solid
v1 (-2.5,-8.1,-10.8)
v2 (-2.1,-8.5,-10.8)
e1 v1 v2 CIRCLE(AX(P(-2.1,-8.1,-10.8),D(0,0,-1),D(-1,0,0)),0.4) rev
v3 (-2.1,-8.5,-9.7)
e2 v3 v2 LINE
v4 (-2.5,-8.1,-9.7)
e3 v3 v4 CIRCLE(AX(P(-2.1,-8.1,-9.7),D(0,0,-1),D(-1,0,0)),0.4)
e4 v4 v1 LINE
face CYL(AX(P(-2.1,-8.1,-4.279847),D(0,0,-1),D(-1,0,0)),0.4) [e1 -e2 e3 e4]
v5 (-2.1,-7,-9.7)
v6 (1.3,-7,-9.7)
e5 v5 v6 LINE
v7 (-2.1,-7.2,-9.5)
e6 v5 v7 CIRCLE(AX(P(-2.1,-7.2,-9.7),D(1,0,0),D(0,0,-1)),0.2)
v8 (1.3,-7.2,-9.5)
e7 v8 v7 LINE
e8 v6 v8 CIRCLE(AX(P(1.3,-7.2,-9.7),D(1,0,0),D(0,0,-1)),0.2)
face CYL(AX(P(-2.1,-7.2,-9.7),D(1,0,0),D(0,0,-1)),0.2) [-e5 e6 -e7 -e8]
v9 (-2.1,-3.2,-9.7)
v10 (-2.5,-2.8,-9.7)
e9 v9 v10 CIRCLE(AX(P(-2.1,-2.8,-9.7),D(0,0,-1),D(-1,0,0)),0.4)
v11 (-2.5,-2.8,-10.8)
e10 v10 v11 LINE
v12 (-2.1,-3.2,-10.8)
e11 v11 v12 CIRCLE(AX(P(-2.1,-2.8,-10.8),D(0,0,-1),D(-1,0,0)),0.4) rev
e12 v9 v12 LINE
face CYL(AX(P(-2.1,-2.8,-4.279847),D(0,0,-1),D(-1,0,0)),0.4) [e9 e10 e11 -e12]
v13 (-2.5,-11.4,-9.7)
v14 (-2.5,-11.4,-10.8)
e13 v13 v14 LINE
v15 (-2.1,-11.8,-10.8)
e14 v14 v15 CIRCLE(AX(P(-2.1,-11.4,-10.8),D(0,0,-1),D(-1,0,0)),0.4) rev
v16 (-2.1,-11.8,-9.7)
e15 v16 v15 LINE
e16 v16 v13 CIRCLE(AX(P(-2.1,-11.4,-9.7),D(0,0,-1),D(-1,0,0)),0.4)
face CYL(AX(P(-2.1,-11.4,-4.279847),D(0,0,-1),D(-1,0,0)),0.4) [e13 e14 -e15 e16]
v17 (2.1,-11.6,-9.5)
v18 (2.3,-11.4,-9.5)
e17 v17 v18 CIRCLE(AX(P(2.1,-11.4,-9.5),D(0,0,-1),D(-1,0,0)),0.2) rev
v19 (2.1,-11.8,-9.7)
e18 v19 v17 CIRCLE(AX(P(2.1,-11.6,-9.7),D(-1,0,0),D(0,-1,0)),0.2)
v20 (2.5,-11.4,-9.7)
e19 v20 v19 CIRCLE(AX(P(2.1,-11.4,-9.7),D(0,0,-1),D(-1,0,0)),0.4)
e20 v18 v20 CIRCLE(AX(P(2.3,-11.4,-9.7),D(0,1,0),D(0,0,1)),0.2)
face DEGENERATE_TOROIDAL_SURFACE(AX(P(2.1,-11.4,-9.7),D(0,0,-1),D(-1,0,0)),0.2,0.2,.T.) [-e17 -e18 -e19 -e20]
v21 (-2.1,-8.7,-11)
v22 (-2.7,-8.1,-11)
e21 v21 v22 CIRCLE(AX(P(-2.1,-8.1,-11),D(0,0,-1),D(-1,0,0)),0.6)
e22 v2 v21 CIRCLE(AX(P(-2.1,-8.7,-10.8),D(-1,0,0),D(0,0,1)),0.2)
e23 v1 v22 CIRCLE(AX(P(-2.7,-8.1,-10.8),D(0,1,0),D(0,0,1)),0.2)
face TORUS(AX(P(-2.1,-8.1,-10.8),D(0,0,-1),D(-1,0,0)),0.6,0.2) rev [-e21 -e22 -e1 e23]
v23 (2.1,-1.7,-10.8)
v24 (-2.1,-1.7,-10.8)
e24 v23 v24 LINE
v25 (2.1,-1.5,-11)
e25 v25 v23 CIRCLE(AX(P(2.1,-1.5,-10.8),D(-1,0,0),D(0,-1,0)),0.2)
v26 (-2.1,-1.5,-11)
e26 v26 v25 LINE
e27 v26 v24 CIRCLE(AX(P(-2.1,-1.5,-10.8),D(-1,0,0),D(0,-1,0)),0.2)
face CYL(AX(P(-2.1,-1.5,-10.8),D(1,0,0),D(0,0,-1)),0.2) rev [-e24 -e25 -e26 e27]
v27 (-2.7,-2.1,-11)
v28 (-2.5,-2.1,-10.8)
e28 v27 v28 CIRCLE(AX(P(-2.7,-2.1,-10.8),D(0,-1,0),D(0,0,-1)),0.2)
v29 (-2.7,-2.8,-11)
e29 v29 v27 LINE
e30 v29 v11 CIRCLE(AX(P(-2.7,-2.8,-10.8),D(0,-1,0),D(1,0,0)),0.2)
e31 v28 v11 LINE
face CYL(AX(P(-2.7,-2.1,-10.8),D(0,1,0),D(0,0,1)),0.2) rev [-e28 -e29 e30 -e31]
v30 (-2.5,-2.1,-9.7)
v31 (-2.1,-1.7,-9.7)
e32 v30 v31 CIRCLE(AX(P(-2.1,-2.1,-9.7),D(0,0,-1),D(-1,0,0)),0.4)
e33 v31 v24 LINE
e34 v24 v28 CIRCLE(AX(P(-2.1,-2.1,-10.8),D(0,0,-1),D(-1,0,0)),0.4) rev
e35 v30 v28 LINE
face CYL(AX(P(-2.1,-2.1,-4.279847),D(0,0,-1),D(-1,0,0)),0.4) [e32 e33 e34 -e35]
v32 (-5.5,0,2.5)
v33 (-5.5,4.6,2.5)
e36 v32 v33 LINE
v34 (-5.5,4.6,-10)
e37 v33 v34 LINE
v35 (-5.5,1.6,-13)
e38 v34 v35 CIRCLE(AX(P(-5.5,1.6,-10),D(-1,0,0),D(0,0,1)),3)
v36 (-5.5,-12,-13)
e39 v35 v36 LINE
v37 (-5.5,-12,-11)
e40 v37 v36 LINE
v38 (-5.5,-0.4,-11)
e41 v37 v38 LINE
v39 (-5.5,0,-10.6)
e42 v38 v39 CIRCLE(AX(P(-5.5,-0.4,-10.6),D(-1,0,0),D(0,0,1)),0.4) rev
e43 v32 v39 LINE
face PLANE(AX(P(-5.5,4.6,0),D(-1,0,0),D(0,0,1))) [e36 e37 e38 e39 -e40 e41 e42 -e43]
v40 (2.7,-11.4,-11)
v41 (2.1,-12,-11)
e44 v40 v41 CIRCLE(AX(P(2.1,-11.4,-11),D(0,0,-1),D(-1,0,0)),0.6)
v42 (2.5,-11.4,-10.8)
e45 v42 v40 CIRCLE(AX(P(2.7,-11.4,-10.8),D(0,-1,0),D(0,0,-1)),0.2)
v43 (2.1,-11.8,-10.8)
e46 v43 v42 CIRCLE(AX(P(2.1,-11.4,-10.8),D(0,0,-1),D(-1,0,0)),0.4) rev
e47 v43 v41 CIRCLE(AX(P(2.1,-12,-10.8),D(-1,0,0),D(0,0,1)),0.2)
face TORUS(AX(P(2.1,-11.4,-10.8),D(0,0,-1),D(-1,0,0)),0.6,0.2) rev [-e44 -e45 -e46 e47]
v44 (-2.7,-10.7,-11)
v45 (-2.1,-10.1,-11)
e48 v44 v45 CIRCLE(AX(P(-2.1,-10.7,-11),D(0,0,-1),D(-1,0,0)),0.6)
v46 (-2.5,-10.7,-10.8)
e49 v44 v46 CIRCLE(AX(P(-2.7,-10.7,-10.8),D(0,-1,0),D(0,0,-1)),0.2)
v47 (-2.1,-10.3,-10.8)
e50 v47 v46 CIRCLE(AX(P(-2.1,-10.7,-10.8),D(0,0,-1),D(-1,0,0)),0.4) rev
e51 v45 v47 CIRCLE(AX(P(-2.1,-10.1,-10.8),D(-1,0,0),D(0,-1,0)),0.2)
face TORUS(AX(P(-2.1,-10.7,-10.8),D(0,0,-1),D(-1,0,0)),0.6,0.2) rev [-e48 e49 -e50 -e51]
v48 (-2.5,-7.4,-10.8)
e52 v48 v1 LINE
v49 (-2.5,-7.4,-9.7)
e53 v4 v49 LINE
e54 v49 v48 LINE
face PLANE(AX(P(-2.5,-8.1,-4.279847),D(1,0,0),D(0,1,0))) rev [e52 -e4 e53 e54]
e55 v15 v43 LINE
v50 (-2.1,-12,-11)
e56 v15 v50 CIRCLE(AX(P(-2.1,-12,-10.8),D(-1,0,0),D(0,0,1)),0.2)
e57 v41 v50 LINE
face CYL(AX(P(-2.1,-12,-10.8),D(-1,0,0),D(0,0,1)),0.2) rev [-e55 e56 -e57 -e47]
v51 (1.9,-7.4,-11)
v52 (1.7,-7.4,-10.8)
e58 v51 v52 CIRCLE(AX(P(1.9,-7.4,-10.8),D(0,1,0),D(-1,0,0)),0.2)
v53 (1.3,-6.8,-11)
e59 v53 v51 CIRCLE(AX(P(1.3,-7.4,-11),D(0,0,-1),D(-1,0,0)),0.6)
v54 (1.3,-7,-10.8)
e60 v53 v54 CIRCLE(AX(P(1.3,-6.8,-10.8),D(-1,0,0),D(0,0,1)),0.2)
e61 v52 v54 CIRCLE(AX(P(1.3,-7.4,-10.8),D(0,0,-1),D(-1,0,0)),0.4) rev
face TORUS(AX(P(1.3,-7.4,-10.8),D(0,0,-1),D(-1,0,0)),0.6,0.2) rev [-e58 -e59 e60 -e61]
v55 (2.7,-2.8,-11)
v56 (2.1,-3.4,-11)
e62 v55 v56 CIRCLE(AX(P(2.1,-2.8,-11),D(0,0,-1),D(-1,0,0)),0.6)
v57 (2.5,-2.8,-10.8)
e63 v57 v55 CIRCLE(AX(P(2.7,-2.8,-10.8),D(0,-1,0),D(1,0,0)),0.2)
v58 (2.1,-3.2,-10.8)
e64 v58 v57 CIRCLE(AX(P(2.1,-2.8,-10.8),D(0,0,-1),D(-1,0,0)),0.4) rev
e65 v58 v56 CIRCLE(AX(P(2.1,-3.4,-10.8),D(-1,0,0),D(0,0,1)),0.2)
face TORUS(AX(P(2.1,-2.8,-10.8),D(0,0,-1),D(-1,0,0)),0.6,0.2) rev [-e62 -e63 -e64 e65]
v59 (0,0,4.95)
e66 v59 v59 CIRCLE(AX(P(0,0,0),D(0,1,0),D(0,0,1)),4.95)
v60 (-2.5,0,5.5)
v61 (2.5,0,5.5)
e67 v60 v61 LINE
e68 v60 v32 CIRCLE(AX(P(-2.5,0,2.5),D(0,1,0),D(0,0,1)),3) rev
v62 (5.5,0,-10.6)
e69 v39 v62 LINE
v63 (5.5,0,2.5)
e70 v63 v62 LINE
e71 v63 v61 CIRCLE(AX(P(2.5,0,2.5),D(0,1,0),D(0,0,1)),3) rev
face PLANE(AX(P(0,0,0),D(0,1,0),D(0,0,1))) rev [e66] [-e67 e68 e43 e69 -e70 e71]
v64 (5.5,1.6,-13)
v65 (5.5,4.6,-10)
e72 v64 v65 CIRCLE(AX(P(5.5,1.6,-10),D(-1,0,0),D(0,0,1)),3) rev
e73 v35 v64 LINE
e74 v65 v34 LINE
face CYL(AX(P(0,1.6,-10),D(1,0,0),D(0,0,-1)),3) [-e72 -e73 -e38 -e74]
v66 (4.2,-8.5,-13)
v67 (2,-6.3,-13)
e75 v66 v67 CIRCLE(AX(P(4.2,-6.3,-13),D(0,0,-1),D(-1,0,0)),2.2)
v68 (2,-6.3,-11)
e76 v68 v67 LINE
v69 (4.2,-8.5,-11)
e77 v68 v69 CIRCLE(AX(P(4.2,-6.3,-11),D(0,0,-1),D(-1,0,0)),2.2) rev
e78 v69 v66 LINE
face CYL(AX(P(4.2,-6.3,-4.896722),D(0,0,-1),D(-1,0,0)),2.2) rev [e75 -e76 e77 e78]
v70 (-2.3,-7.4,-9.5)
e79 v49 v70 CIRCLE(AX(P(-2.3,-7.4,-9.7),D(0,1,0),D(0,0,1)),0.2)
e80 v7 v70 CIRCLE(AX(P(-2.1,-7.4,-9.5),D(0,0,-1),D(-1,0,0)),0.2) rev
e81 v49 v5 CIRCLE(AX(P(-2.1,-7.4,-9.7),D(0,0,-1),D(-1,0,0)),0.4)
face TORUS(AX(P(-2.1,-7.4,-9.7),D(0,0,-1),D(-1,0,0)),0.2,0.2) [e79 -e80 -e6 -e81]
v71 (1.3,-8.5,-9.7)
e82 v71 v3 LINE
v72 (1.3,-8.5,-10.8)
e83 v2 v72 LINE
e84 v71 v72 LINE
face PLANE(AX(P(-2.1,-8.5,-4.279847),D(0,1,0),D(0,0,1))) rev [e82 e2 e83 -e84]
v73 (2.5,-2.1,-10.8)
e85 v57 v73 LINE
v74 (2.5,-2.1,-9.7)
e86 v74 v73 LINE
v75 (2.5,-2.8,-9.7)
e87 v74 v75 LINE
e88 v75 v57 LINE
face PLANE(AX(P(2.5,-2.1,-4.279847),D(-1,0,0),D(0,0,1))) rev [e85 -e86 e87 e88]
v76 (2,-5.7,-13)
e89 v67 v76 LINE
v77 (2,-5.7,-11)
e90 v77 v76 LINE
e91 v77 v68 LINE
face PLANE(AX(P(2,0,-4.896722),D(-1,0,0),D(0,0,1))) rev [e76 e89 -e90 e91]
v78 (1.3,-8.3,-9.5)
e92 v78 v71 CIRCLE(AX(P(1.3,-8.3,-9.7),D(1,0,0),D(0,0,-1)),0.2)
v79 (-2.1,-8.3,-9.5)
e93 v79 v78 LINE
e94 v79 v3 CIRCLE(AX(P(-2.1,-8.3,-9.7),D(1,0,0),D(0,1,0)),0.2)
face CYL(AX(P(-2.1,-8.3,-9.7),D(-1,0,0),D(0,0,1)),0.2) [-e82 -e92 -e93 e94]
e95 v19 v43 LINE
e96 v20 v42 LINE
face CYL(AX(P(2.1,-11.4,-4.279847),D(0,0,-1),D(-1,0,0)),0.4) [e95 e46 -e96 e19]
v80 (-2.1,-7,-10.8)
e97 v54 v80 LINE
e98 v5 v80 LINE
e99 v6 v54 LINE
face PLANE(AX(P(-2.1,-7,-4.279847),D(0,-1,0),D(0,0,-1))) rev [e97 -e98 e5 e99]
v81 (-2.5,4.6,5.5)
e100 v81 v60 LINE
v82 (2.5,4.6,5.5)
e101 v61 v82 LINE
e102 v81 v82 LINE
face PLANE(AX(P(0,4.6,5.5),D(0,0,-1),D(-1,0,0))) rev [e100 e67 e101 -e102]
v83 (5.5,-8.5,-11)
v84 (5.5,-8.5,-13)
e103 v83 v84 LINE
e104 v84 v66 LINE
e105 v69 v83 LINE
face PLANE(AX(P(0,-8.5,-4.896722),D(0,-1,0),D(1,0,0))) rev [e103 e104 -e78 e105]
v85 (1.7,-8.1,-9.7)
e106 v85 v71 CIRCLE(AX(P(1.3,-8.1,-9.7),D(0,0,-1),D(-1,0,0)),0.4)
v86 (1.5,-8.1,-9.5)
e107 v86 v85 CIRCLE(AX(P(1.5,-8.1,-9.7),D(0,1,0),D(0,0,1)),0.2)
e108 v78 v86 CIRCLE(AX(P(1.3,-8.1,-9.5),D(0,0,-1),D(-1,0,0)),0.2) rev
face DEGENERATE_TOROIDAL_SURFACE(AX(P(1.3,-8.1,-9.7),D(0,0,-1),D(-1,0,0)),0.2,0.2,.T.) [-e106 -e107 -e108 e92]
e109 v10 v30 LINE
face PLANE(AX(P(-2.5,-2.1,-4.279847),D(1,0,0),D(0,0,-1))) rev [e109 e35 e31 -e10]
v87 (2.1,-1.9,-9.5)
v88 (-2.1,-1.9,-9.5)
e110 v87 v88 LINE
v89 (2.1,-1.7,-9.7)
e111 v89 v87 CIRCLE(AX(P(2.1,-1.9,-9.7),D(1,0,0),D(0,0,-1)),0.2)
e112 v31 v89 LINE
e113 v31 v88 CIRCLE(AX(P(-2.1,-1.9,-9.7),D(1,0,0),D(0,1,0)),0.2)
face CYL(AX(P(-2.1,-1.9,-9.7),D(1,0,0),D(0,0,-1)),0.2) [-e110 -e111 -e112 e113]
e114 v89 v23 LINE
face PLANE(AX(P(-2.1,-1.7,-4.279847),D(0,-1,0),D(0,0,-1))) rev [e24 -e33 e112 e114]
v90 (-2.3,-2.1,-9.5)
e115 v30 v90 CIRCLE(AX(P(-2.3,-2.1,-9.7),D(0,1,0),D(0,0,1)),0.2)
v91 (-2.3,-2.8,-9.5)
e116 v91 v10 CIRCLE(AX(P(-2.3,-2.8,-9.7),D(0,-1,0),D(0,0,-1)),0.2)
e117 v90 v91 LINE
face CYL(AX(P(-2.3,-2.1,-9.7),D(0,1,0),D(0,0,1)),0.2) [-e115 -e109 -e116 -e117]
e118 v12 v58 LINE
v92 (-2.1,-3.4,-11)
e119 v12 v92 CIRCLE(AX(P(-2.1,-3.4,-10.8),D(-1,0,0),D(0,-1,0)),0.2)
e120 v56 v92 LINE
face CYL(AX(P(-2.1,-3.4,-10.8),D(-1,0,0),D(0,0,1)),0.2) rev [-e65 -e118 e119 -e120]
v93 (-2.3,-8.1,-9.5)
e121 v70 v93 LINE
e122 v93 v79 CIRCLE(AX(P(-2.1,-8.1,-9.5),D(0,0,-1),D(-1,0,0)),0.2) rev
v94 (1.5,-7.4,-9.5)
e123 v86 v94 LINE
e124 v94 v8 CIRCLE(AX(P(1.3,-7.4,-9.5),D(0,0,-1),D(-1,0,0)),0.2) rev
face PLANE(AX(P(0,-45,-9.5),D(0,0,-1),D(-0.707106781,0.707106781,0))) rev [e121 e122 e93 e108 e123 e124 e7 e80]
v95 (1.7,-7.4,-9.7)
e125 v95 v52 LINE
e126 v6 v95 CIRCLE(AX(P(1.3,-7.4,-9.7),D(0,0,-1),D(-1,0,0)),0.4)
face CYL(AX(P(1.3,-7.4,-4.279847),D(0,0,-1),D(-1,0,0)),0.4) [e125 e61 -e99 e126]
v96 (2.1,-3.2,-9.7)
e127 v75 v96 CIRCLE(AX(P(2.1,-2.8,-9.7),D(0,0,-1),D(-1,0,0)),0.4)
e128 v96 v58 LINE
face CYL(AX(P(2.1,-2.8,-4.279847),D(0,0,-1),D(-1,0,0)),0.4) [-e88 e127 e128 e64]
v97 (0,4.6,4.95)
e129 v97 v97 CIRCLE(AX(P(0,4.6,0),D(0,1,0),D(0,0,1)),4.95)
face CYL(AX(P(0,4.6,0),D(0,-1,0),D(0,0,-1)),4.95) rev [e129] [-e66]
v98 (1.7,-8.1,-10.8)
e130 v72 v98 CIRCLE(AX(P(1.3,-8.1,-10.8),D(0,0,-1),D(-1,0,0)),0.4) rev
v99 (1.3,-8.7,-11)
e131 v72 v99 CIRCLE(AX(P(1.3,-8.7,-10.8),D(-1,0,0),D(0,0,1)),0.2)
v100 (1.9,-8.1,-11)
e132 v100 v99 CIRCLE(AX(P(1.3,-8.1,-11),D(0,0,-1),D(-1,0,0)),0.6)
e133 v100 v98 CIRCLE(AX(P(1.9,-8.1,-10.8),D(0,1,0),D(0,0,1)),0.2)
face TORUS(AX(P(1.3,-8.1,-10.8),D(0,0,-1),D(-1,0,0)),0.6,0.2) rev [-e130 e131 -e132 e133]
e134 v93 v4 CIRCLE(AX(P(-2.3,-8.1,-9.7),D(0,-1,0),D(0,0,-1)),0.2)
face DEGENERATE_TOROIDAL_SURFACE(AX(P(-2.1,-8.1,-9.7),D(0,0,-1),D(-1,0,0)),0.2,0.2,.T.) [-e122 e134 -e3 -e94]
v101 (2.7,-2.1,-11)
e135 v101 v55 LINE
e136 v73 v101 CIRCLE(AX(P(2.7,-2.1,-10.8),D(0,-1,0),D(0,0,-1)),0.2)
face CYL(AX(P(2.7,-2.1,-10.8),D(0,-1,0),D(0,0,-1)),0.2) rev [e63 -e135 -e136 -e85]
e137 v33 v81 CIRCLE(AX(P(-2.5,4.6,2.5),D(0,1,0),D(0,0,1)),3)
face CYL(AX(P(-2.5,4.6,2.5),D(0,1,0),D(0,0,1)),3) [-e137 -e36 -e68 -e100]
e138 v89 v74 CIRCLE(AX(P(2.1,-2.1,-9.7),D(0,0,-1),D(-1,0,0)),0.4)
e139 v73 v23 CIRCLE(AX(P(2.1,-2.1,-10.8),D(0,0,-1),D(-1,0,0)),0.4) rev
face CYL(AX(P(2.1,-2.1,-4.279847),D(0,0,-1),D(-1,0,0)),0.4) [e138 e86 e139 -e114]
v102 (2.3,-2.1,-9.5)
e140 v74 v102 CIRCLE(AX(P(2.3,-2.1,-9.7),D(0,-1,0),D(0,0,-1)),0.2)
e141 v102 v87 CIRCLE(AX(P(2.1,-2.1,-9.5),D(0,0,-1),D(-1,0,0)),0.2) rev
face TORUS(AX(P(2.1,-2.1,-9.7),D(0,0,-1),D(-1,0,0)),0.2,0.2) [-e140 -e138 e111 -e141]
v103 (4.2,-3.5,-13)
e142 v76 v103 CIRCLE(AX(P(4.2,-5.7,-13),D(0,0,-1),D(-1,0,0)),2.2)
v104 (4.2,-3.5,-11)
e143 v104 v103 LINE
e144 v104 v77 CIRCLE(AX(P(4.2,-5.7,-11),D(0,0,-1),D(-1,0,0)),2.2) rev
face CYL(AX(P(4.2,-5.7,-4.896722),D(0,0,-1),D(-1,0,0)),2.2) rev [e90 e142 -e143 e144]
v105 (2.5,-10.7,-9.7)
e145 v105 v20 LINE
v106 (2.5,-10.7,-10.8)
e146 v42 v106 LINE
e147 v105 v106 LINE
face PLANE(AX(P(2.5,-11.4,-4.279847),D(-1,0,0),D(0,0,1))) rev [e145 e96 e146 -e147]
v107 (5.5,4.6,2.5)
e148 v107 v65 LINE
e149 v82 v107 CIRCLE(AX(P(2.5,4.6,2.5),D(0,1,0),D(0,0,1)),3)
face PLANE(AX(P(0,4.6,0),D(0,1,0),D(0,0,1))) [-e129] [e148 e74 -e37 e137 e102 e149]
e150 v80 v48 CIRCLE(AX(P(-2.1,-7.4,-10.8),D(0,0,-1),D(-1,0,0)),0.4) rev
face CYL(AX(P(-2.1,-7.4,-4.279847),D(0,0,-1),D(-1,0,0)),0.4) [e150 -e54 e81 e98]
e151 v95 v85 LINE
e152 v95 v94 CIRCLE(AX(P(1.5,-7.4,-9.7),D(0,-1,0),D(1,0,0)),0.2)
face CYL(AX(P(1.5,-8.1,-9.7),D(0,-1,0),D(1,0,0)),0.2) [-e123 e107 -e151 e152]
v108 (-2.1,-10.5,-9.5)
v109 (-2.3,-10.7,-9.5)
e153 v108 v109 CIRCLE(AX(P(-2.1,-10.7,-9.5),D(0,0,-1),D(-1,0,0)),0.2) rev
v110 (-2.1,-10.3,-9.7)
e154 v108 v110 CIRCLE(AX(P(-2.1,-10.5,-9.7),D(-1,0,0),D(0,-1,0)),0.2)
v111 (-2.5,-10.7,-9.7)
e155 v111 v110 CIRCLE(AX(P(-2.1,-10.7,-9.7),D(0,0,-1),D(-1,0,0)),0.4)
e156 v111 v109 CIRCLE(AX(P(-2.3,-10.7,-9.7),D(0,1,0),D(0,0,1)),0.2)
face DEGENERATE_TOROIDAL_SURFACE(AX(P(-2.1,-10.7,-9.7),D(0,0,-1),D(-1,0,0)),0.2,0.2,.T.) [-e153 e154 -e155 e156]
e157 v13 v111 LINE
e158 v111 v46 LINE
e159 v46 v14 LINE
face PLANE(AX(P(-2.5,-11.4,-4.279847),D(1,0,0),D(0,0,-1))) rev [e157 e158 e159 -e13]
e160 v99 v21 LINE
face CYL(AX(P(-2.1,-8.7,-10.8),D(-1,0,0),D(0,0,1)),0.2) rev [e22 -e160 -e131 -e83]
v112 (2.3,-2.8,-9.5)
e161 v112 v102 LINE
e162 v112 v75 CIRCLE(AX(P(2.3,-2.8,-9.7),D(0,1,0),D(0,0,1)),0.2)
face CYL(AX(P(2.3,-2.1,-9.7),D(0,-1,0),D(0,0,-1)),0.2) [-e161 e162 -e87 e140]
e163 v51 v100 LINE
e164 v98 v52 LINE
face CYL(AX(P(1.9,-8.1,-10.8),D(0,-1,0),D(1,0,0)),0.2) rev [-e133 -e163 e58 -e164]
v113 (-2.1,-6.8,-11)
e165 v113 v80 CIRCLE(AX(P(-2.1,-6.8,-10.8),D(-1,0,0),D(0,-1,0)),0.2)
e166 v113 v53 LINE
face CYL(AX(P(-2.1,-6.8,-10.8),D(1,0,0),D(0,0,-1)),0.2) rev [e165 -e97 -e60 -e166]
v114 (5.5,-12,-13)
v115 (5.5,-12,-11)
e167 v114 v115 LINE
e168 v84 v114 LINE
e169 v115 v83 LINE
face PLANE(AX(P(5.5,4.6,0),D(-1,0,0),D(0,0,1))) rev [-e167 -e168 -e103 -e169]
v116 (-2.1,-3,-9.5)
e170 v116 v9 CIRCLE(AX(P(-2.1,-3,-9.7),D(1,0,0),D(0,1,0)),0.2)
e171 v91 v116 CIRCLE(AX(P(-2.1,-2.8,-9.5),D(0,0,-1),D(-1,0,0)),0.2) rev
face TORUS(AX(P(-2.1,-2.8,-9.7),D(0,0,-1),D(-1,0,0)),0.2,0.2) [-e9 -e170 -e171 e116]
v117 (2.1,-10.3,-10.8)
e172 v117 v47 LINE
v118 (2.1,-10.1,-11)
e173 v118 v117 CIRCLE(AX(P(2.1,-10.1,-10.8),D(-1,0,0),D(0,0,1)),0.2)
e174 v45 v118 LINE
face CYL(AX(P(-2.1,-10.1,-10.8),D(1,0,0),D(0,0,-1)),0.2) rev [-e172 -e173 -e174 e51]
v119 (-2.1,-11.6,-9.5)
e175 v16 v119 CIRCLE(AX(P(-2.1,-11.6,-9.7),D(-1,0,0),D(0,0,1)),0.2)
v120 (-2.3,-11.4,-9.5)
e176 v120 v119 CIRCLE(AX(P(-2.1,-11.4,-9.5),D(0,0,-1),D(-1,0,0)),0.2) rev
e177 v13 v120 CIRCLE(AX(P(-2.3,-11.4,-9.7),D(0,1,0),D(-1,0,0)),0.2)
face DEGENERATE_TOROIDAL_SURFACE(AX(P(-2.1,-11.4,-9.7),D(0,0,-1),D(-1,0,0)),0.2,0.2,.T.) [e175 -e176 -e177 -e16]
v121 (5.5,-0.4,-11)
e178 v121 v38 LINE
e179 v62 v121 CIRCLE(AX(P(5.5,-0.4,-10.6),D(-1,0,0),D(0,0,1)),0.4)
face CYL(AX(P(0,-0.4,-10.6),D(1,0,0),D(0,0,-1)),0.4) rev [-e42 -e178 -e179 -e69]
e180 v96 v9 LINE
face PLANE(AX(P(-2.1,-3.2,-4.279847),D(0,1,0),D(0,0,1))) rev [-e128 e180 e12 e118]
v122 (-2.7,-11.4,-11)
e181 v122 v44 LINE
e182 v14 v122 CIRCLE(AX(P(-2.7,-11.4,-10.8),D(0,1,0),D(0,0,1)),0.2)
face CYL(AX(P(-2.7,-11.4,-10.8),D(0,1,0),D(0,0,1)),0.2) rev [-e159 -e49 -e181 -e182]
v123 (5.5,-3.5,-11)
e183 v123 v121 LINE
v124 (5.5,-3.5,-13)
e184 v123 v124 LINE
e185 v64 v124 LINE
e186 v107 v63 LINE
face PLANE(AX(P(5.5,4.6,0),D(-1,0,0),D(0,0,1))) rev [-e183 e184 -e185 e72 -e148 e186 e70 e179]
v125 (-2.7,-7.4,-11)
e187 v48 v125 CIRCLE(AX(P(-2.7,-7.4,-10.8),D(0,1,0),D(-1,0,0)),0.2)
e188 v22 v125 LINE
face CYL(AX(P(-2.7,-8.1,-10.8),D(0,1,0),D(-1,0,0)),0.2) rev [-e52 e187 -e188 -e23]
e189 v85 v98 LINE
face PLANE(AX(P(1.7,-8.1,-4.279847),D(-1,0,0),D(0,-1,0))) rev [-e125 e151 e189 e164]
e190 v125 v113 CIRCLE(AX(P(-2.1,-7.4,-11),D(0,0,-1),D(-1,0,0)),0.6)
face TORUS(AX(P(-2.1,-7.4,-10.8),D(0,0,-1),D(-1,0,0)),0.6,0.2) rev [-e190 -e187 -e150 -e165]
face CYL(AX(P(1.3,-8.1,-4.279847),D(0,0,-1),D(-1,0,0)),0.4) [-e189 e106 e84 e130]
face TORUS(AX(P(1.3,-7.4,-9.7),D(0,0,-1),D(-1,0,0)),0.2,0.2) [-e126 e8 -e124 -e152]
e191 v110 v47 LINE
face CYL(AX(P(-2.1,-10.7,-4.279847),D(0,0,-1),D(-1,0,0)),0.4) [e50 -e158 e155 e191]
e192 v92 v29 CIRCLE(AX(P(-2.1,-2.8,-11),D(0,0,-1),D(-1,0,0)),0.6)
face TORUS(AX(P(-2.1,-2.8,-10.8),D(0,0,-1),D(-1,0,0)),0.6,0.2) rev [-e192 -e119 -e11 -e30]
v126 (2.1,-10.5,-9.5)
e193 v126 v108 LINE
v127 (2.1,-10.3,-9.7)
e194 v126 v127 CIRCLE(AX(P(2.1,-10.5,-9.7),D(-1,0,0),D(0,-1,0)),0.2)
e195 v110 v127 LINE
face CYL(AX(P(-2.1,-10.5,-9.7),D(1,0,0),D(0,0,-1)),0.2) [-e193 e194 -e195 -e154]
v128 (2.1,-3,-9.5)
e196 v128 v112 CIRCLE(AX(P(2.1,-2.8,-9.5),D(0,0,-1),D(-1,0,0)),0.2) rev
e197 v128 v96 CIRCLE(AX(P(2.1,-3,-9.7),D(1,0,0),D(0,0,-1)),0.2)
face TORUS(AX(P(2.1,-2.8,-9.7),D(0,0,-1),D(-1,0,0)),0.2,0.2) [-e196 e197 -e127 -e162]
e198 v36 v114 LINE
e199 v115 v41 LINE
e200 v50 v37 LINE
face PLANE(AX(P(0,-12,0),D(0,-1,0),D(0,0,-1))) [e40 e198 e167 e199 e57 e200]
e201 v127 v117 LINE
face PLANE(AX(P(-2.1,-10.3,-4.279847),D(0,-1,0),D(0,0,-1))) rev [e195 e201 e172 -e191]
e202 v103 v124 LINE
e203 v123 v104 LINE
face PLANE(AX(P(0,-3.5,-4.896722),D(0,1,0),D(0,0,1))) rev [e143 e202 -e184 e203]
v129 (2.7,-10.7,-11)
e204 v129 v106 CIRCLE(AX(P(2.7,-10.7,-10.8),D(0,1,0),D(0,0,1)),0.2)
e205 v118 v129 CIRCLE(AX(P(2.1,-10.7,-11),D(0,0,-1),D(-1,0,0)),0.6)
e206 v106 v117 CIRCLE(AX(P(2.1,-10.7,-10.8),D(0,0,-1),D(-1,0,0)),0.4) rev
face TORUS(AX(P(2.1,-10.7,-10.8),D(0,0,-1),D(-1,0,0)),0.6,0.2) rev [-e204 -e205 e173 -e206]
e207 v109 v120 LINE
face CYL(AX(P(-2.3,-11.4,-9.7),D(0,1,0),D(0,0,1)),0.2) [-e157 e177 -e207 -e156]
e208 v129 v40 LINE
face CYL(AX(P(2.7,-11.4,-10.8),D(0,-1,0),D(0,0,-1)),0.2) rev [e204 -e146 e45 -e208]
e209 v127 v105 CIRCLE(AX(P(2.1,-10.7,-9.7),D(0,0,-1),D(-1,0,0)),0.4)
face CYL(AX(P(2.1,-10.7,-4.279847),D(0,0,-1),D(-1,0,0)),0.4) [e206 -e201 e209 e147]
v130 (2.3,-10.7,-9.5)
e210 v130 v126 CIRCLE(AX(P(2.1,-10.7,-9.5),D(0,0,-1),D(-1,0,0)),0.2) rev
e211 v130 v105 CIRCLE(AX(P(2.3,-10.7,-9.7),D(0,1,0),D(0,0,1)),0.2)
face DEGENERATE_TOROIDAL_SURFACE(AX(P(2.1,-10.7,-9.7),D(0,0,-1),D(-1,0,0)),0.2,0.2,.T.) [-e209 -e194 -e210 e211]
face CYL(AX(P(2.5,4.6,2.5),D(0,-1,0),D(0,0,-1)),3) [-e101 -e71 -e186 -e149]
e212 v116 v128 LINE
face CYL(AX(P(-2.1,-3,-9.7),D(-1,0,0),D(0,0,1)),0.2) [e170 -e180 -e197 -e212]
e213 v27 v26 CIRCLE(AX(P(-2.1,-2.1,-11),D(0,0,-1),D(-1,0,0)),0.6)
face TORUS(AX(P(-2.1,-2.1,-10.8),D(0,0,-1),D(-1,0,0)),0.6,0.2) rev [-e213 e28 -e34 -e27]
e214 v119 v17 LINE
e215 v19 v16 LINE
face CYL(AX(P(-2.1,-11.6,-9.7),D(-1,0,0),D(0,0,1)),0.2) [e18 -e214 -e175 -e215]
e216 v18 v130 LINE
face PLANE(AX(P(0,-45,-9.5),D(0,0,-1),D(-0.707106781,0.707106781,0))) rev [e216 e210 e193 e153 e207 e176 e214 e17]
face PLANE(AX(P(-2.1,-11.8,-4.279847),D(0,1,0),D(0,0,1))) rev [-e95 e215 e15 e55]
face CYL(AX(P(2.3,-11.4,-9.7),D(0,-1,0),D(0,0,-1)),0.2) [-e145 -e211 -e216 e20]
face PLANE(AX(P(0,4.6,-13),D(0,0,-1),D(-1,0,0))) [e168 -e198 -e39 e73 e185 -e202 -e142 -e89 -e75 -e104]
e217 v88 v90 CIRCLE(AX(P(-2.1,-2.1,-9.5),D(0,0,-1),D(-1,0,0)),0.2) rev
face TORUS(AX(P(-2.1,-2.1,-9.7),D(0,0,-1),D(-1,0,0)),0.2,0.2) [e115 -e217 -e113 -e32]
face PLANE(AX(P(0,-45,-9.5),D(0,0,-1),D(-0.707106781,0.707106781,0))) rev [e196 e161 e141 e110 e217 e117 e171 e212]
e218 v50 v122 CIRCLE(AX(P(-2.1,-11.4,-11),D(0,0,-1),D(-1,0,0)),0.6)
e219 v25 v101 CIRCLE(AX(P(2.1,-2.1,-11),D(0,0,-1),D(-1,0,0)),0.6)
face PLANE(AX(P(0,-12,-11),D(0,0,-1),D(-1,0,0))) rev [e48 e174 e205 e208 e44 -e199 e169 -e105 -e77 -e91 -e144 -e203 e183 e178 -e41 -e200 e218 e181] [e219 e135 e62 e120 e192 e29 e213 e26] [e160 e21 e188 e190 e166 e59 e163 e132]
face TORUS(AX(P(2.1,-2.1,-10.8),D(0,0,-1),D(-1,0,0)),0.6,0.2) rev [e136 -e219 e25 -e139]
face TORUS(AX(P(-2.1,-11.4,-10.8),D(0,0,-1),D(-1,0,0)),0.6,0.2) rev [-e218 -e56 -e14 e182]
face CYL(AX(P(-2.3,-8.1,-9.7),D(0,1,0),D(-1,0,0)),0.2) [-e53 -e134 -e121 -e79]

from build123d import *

# Parameters (mm, degrees)
SKETCH1_W           = 11
SKETCH1_H           = 11
SKETCH1_R           = 4.95
SKETCH1_H_2         = 7.5
BOSS_EXTRUDE1_DEPTH = 4.6
SKETCH2_W           = 11
SKETCH2_H           = 2
BOSS_EXTRUDE2_DEPTH = 12
CUT_EXTRUDE1_DEPTH  = 2
FILLET1_R           = 0.4
FILLET2_R           = 3
FILLET3_R           = 3
BOSS_EXTRUDE3_DEPTH = 1.5
FILLET4_R           = 0.2


with BuildPart() as part:
    # Sketch1 → Boss-Extrude1 (new body)
    # profile 1 of 2: a face of its own
    with BuildSketch(Plane(origin=(0, 0, 0), x_dir=(1, 0, 0), z_dir=(0, 1, 0))):
        Rectangle(SKETCH1_W, SKETCH1_H)
        with Locations(Location((0, 0, 0), (0, 0, 270))):
            Circle(SKETCH1_R, mode=Mode.SUBTRACT)
    # profile 2 of 2: a face of its own
    with BuildSketch(Plane(origin=(0, 0, 0), x_dir=(1, 0, 0), z_dir=(0, 1, 0))):
        with Locations((0, 9.25)):
            Rectangle(SKETCH1_W, SKETCH1_H_2)
    extrude(amount=BOSS_EXTRUDE1_DEPTH)

    # Sketch2 → Boss-Extrude2 (add)
    with BuildSketch(Plane.XZ):
        with Locations((0, -12)):
            Rectangle(SKETCH2_W, SKETCH2_H)
    extrude(amount=BOSS_EXTRUDE2_DEPTH)

    # Sketch3 → Cut-Extrude1 (cut)
    with BuildSketch(Plane(origin=(0, 0, -13), x_dir=(-1, 0, 0), z_dir=(0, 0, -1))):
        with BuildLine():
            Line((-5.5, -3.5), (-5.5, -6))
            Line((-5.5, -6), (-2, -6))
            Line((-2, -6), (-2, -5.7))
            ThreePointArc((-2, -5.7), (-2.644365081, -4.144365081), (-4.2, -3.5))
            Line((-4.2, -3.5), (-5.5, -3.5))
        make_face()
        with BuildLine():
            Line((-2, -6), (-5.5, -6))
            Line((-5.5, -6), (-5.5, -8.5))
            Line((-5.5, -8.5), (-4.2, -8.5))
            ThreePointArc((-4.2, -8.5), (-2.644365081, -7.855634919), (-2, -6.3))
            Line((-2, -6.3), (-2, -6))
        make_face()
    extrude(amount=-CUT_EXTRUDE1_DEPTH, mode=Mode.SUBTRACT)

    # Fillet1
    fillet1_edges = [part.edges().sort_by_distance(p)[0] for p in [
        (0, 0, -11),
    ]]
    fillet(fillet1_edges, radius=FILLET1_R)

    # Fillet2
    fillet2_edges = [part.edges().sort_by_distance(p)[0] for p in [
        (0, 4.6, -13),
    ]]
    fillet(fillet2_edges, radius=FILLET2_R)

    # Fillet3
    fillet3_edges = [part.edges().sort_by_distance(p)[0] for p in [
        (-5.5, 2.3, 5.5),
        (5.5, 2.3, 5.5),
    ]]
    fillet(fillet3_edges, radius=FILLET3_R)

    # Sketch4 → Boss-Extrude3 (add)
    with BuildSketch(Plane.XY.offset(-11)):
        with BuildLine():
            Line((-2.1, -1.7), (2.1, -1.7))
            ThreePointArc((2.1, -1.7), (2.382842712, -1.817157288), (2.5, -2.1))
            Line((2.5, -2.1), (2.5, -2.8))
            ThreePointArc((2.5, -2.8), (2.382842712, -3.082842712), (2.1, -3.2))
            Line((2.1, -3.2), (-2.1, -3.2))
            ThreePointArc((-2.1, -3.2), (-2.382842712, -3.082842712), (-2.5, -2.8))
            Line((-2.5, -2.8), (-2.5, -2.1))
            ThreePointArc((-2.5, -2.1), (-2.382842712, -1.817157288), (-2.1, -1.7))
        make_face()
        with BuildLine():
            Line((-2.1, -11.8), (2.1, -11.8))
            ThreePointArc((2.1, -11.8), (2.382842712, -11.682842712), (2.5, -11.4))
            Line((2.5, -11.4), (2.5, -10.7))
            ThreePointArc((2.5, -10.7), (2.382842712, -10.417157288), (2.1, -10.3))
            Line((2.1, -10.3), (-2.1, -10.3))
            ThreePointArc((-2.1, -10.3), (-2.382842712, -10.417157288), (-2.5, -10.7))
            Line((-2.5, -10.7), (-2.5, -11.4))
            ThreePointArc((-2.5, -11.4), (-2.382842712, -11.682842712), (-2.1, -11.8))
        make_face()
        with BuildLine():
            Line((-2.1, -8.5), (1.3, -8.5))
            ThreePointArc((1.3, -8.5), (1.582842712, -8.382842712), (1.7, -8.1))
            Line((1.7, -8.1), (1.7, -7.4))
            ThreePointArc((1.7, -7.4), (1.582842712, -7.117157288), (1.3, -7))
            Line((1.3, -7), (-2.1, -7))
            ThreePointArc((-2.1, -7), (-2.382842712, -7.117157288), (-2.5, -7.4))
            Line((-2.5, -7.4), (-2.5, -8.1))
            ThreePointArc((-2.5, -8.1), (-2.382842712, -8.382842712), (-2.1, -8.5))
        make_face()
    extrude(amount=BOSS_EXTRUDE3_DEPTH)

    # Fillet4
    fillet4_edges = [part.edges().sort_by_distance(p)[0] for p in [
        (-2.5, -7.75, -9.5),
        (-2.5, -7.75, -11),
        (-2.382842712, -7.117157288, -9.5),
        (-2.382842712, -7.117157288, -11),
        (-0.4, -7, -9.5),
        (-0.4, -7, -11),
        (1.582842712, -7.117157288, -9.5),
        (1.582842712, -7.117157288, -11),
        (1.7, -7.75, -9.5),
        (1.7, -7.75, -11),
        (1.582842712, -8.382842712, -9.5),
        (1.582842712, -8.382842712, -11),
        (-0.4, -8.5, -9.5),
        (-0.4, -8.5, -11),
        (-2.382842712, -8.382842712, -9.5),
        (-2.382842712, -8.382842712, -11),
        (-2.5, -2.45, -9.5),
        (-2.5, -2.45, -11),
        (-2.382842712, -1.817157288, -9.5),
        (-2.382842712, -1.817157288, -11),
        (0, -1.7, -9.5),
        (0, -1.7, -11),
        (2.382842712, -1.817157288, -9.5),
        (2.382842712, -1.817157288, -11),
        (2.5, -2.45, -9.5),
        (2.5, -2.45, -11),
        (2.382842712, -3.082842712, -9.5),
        (2.382842712, -3.082842712, -11),
        (0, -3.2, -9.5),
        (0, -3.2, -11),
        (-2.382842712, -3.082842712, -9.5),
        (-2.382842712, -3.082842712, -11),
        (2.5, -11.05, -9.5),
        (2.5, -11.05, -11),
        (2.382842712, -11.682842712, -9.5),
        (2.382842712, -11.682842712, -11),
        (0, -11.8, -9.5),
        (0, -11.8, -11),
        (-2.382842712, -11.682842712, -9.5),
        (-2.382842712, -11.682842712, -11),
        (-2.5, -11.05, -9.5),
        (-2.5, -11.05, -11),
        (-2.382842712, -10.417157288, -9.5),
        (-2.382842712, -10.417157288, -11),
        (0, -10.3, -9.5),
        (0, -10.3, -11),
        (2.382842712, -10.417157288, -9.5),
        (2.382842712, -10.417157288, -11),
    ]]
    fillet(fillet4_edges, radius=FILLET4_R - 0.0001)  # a hair under: the kernel refuses the full size


solid = part.part
